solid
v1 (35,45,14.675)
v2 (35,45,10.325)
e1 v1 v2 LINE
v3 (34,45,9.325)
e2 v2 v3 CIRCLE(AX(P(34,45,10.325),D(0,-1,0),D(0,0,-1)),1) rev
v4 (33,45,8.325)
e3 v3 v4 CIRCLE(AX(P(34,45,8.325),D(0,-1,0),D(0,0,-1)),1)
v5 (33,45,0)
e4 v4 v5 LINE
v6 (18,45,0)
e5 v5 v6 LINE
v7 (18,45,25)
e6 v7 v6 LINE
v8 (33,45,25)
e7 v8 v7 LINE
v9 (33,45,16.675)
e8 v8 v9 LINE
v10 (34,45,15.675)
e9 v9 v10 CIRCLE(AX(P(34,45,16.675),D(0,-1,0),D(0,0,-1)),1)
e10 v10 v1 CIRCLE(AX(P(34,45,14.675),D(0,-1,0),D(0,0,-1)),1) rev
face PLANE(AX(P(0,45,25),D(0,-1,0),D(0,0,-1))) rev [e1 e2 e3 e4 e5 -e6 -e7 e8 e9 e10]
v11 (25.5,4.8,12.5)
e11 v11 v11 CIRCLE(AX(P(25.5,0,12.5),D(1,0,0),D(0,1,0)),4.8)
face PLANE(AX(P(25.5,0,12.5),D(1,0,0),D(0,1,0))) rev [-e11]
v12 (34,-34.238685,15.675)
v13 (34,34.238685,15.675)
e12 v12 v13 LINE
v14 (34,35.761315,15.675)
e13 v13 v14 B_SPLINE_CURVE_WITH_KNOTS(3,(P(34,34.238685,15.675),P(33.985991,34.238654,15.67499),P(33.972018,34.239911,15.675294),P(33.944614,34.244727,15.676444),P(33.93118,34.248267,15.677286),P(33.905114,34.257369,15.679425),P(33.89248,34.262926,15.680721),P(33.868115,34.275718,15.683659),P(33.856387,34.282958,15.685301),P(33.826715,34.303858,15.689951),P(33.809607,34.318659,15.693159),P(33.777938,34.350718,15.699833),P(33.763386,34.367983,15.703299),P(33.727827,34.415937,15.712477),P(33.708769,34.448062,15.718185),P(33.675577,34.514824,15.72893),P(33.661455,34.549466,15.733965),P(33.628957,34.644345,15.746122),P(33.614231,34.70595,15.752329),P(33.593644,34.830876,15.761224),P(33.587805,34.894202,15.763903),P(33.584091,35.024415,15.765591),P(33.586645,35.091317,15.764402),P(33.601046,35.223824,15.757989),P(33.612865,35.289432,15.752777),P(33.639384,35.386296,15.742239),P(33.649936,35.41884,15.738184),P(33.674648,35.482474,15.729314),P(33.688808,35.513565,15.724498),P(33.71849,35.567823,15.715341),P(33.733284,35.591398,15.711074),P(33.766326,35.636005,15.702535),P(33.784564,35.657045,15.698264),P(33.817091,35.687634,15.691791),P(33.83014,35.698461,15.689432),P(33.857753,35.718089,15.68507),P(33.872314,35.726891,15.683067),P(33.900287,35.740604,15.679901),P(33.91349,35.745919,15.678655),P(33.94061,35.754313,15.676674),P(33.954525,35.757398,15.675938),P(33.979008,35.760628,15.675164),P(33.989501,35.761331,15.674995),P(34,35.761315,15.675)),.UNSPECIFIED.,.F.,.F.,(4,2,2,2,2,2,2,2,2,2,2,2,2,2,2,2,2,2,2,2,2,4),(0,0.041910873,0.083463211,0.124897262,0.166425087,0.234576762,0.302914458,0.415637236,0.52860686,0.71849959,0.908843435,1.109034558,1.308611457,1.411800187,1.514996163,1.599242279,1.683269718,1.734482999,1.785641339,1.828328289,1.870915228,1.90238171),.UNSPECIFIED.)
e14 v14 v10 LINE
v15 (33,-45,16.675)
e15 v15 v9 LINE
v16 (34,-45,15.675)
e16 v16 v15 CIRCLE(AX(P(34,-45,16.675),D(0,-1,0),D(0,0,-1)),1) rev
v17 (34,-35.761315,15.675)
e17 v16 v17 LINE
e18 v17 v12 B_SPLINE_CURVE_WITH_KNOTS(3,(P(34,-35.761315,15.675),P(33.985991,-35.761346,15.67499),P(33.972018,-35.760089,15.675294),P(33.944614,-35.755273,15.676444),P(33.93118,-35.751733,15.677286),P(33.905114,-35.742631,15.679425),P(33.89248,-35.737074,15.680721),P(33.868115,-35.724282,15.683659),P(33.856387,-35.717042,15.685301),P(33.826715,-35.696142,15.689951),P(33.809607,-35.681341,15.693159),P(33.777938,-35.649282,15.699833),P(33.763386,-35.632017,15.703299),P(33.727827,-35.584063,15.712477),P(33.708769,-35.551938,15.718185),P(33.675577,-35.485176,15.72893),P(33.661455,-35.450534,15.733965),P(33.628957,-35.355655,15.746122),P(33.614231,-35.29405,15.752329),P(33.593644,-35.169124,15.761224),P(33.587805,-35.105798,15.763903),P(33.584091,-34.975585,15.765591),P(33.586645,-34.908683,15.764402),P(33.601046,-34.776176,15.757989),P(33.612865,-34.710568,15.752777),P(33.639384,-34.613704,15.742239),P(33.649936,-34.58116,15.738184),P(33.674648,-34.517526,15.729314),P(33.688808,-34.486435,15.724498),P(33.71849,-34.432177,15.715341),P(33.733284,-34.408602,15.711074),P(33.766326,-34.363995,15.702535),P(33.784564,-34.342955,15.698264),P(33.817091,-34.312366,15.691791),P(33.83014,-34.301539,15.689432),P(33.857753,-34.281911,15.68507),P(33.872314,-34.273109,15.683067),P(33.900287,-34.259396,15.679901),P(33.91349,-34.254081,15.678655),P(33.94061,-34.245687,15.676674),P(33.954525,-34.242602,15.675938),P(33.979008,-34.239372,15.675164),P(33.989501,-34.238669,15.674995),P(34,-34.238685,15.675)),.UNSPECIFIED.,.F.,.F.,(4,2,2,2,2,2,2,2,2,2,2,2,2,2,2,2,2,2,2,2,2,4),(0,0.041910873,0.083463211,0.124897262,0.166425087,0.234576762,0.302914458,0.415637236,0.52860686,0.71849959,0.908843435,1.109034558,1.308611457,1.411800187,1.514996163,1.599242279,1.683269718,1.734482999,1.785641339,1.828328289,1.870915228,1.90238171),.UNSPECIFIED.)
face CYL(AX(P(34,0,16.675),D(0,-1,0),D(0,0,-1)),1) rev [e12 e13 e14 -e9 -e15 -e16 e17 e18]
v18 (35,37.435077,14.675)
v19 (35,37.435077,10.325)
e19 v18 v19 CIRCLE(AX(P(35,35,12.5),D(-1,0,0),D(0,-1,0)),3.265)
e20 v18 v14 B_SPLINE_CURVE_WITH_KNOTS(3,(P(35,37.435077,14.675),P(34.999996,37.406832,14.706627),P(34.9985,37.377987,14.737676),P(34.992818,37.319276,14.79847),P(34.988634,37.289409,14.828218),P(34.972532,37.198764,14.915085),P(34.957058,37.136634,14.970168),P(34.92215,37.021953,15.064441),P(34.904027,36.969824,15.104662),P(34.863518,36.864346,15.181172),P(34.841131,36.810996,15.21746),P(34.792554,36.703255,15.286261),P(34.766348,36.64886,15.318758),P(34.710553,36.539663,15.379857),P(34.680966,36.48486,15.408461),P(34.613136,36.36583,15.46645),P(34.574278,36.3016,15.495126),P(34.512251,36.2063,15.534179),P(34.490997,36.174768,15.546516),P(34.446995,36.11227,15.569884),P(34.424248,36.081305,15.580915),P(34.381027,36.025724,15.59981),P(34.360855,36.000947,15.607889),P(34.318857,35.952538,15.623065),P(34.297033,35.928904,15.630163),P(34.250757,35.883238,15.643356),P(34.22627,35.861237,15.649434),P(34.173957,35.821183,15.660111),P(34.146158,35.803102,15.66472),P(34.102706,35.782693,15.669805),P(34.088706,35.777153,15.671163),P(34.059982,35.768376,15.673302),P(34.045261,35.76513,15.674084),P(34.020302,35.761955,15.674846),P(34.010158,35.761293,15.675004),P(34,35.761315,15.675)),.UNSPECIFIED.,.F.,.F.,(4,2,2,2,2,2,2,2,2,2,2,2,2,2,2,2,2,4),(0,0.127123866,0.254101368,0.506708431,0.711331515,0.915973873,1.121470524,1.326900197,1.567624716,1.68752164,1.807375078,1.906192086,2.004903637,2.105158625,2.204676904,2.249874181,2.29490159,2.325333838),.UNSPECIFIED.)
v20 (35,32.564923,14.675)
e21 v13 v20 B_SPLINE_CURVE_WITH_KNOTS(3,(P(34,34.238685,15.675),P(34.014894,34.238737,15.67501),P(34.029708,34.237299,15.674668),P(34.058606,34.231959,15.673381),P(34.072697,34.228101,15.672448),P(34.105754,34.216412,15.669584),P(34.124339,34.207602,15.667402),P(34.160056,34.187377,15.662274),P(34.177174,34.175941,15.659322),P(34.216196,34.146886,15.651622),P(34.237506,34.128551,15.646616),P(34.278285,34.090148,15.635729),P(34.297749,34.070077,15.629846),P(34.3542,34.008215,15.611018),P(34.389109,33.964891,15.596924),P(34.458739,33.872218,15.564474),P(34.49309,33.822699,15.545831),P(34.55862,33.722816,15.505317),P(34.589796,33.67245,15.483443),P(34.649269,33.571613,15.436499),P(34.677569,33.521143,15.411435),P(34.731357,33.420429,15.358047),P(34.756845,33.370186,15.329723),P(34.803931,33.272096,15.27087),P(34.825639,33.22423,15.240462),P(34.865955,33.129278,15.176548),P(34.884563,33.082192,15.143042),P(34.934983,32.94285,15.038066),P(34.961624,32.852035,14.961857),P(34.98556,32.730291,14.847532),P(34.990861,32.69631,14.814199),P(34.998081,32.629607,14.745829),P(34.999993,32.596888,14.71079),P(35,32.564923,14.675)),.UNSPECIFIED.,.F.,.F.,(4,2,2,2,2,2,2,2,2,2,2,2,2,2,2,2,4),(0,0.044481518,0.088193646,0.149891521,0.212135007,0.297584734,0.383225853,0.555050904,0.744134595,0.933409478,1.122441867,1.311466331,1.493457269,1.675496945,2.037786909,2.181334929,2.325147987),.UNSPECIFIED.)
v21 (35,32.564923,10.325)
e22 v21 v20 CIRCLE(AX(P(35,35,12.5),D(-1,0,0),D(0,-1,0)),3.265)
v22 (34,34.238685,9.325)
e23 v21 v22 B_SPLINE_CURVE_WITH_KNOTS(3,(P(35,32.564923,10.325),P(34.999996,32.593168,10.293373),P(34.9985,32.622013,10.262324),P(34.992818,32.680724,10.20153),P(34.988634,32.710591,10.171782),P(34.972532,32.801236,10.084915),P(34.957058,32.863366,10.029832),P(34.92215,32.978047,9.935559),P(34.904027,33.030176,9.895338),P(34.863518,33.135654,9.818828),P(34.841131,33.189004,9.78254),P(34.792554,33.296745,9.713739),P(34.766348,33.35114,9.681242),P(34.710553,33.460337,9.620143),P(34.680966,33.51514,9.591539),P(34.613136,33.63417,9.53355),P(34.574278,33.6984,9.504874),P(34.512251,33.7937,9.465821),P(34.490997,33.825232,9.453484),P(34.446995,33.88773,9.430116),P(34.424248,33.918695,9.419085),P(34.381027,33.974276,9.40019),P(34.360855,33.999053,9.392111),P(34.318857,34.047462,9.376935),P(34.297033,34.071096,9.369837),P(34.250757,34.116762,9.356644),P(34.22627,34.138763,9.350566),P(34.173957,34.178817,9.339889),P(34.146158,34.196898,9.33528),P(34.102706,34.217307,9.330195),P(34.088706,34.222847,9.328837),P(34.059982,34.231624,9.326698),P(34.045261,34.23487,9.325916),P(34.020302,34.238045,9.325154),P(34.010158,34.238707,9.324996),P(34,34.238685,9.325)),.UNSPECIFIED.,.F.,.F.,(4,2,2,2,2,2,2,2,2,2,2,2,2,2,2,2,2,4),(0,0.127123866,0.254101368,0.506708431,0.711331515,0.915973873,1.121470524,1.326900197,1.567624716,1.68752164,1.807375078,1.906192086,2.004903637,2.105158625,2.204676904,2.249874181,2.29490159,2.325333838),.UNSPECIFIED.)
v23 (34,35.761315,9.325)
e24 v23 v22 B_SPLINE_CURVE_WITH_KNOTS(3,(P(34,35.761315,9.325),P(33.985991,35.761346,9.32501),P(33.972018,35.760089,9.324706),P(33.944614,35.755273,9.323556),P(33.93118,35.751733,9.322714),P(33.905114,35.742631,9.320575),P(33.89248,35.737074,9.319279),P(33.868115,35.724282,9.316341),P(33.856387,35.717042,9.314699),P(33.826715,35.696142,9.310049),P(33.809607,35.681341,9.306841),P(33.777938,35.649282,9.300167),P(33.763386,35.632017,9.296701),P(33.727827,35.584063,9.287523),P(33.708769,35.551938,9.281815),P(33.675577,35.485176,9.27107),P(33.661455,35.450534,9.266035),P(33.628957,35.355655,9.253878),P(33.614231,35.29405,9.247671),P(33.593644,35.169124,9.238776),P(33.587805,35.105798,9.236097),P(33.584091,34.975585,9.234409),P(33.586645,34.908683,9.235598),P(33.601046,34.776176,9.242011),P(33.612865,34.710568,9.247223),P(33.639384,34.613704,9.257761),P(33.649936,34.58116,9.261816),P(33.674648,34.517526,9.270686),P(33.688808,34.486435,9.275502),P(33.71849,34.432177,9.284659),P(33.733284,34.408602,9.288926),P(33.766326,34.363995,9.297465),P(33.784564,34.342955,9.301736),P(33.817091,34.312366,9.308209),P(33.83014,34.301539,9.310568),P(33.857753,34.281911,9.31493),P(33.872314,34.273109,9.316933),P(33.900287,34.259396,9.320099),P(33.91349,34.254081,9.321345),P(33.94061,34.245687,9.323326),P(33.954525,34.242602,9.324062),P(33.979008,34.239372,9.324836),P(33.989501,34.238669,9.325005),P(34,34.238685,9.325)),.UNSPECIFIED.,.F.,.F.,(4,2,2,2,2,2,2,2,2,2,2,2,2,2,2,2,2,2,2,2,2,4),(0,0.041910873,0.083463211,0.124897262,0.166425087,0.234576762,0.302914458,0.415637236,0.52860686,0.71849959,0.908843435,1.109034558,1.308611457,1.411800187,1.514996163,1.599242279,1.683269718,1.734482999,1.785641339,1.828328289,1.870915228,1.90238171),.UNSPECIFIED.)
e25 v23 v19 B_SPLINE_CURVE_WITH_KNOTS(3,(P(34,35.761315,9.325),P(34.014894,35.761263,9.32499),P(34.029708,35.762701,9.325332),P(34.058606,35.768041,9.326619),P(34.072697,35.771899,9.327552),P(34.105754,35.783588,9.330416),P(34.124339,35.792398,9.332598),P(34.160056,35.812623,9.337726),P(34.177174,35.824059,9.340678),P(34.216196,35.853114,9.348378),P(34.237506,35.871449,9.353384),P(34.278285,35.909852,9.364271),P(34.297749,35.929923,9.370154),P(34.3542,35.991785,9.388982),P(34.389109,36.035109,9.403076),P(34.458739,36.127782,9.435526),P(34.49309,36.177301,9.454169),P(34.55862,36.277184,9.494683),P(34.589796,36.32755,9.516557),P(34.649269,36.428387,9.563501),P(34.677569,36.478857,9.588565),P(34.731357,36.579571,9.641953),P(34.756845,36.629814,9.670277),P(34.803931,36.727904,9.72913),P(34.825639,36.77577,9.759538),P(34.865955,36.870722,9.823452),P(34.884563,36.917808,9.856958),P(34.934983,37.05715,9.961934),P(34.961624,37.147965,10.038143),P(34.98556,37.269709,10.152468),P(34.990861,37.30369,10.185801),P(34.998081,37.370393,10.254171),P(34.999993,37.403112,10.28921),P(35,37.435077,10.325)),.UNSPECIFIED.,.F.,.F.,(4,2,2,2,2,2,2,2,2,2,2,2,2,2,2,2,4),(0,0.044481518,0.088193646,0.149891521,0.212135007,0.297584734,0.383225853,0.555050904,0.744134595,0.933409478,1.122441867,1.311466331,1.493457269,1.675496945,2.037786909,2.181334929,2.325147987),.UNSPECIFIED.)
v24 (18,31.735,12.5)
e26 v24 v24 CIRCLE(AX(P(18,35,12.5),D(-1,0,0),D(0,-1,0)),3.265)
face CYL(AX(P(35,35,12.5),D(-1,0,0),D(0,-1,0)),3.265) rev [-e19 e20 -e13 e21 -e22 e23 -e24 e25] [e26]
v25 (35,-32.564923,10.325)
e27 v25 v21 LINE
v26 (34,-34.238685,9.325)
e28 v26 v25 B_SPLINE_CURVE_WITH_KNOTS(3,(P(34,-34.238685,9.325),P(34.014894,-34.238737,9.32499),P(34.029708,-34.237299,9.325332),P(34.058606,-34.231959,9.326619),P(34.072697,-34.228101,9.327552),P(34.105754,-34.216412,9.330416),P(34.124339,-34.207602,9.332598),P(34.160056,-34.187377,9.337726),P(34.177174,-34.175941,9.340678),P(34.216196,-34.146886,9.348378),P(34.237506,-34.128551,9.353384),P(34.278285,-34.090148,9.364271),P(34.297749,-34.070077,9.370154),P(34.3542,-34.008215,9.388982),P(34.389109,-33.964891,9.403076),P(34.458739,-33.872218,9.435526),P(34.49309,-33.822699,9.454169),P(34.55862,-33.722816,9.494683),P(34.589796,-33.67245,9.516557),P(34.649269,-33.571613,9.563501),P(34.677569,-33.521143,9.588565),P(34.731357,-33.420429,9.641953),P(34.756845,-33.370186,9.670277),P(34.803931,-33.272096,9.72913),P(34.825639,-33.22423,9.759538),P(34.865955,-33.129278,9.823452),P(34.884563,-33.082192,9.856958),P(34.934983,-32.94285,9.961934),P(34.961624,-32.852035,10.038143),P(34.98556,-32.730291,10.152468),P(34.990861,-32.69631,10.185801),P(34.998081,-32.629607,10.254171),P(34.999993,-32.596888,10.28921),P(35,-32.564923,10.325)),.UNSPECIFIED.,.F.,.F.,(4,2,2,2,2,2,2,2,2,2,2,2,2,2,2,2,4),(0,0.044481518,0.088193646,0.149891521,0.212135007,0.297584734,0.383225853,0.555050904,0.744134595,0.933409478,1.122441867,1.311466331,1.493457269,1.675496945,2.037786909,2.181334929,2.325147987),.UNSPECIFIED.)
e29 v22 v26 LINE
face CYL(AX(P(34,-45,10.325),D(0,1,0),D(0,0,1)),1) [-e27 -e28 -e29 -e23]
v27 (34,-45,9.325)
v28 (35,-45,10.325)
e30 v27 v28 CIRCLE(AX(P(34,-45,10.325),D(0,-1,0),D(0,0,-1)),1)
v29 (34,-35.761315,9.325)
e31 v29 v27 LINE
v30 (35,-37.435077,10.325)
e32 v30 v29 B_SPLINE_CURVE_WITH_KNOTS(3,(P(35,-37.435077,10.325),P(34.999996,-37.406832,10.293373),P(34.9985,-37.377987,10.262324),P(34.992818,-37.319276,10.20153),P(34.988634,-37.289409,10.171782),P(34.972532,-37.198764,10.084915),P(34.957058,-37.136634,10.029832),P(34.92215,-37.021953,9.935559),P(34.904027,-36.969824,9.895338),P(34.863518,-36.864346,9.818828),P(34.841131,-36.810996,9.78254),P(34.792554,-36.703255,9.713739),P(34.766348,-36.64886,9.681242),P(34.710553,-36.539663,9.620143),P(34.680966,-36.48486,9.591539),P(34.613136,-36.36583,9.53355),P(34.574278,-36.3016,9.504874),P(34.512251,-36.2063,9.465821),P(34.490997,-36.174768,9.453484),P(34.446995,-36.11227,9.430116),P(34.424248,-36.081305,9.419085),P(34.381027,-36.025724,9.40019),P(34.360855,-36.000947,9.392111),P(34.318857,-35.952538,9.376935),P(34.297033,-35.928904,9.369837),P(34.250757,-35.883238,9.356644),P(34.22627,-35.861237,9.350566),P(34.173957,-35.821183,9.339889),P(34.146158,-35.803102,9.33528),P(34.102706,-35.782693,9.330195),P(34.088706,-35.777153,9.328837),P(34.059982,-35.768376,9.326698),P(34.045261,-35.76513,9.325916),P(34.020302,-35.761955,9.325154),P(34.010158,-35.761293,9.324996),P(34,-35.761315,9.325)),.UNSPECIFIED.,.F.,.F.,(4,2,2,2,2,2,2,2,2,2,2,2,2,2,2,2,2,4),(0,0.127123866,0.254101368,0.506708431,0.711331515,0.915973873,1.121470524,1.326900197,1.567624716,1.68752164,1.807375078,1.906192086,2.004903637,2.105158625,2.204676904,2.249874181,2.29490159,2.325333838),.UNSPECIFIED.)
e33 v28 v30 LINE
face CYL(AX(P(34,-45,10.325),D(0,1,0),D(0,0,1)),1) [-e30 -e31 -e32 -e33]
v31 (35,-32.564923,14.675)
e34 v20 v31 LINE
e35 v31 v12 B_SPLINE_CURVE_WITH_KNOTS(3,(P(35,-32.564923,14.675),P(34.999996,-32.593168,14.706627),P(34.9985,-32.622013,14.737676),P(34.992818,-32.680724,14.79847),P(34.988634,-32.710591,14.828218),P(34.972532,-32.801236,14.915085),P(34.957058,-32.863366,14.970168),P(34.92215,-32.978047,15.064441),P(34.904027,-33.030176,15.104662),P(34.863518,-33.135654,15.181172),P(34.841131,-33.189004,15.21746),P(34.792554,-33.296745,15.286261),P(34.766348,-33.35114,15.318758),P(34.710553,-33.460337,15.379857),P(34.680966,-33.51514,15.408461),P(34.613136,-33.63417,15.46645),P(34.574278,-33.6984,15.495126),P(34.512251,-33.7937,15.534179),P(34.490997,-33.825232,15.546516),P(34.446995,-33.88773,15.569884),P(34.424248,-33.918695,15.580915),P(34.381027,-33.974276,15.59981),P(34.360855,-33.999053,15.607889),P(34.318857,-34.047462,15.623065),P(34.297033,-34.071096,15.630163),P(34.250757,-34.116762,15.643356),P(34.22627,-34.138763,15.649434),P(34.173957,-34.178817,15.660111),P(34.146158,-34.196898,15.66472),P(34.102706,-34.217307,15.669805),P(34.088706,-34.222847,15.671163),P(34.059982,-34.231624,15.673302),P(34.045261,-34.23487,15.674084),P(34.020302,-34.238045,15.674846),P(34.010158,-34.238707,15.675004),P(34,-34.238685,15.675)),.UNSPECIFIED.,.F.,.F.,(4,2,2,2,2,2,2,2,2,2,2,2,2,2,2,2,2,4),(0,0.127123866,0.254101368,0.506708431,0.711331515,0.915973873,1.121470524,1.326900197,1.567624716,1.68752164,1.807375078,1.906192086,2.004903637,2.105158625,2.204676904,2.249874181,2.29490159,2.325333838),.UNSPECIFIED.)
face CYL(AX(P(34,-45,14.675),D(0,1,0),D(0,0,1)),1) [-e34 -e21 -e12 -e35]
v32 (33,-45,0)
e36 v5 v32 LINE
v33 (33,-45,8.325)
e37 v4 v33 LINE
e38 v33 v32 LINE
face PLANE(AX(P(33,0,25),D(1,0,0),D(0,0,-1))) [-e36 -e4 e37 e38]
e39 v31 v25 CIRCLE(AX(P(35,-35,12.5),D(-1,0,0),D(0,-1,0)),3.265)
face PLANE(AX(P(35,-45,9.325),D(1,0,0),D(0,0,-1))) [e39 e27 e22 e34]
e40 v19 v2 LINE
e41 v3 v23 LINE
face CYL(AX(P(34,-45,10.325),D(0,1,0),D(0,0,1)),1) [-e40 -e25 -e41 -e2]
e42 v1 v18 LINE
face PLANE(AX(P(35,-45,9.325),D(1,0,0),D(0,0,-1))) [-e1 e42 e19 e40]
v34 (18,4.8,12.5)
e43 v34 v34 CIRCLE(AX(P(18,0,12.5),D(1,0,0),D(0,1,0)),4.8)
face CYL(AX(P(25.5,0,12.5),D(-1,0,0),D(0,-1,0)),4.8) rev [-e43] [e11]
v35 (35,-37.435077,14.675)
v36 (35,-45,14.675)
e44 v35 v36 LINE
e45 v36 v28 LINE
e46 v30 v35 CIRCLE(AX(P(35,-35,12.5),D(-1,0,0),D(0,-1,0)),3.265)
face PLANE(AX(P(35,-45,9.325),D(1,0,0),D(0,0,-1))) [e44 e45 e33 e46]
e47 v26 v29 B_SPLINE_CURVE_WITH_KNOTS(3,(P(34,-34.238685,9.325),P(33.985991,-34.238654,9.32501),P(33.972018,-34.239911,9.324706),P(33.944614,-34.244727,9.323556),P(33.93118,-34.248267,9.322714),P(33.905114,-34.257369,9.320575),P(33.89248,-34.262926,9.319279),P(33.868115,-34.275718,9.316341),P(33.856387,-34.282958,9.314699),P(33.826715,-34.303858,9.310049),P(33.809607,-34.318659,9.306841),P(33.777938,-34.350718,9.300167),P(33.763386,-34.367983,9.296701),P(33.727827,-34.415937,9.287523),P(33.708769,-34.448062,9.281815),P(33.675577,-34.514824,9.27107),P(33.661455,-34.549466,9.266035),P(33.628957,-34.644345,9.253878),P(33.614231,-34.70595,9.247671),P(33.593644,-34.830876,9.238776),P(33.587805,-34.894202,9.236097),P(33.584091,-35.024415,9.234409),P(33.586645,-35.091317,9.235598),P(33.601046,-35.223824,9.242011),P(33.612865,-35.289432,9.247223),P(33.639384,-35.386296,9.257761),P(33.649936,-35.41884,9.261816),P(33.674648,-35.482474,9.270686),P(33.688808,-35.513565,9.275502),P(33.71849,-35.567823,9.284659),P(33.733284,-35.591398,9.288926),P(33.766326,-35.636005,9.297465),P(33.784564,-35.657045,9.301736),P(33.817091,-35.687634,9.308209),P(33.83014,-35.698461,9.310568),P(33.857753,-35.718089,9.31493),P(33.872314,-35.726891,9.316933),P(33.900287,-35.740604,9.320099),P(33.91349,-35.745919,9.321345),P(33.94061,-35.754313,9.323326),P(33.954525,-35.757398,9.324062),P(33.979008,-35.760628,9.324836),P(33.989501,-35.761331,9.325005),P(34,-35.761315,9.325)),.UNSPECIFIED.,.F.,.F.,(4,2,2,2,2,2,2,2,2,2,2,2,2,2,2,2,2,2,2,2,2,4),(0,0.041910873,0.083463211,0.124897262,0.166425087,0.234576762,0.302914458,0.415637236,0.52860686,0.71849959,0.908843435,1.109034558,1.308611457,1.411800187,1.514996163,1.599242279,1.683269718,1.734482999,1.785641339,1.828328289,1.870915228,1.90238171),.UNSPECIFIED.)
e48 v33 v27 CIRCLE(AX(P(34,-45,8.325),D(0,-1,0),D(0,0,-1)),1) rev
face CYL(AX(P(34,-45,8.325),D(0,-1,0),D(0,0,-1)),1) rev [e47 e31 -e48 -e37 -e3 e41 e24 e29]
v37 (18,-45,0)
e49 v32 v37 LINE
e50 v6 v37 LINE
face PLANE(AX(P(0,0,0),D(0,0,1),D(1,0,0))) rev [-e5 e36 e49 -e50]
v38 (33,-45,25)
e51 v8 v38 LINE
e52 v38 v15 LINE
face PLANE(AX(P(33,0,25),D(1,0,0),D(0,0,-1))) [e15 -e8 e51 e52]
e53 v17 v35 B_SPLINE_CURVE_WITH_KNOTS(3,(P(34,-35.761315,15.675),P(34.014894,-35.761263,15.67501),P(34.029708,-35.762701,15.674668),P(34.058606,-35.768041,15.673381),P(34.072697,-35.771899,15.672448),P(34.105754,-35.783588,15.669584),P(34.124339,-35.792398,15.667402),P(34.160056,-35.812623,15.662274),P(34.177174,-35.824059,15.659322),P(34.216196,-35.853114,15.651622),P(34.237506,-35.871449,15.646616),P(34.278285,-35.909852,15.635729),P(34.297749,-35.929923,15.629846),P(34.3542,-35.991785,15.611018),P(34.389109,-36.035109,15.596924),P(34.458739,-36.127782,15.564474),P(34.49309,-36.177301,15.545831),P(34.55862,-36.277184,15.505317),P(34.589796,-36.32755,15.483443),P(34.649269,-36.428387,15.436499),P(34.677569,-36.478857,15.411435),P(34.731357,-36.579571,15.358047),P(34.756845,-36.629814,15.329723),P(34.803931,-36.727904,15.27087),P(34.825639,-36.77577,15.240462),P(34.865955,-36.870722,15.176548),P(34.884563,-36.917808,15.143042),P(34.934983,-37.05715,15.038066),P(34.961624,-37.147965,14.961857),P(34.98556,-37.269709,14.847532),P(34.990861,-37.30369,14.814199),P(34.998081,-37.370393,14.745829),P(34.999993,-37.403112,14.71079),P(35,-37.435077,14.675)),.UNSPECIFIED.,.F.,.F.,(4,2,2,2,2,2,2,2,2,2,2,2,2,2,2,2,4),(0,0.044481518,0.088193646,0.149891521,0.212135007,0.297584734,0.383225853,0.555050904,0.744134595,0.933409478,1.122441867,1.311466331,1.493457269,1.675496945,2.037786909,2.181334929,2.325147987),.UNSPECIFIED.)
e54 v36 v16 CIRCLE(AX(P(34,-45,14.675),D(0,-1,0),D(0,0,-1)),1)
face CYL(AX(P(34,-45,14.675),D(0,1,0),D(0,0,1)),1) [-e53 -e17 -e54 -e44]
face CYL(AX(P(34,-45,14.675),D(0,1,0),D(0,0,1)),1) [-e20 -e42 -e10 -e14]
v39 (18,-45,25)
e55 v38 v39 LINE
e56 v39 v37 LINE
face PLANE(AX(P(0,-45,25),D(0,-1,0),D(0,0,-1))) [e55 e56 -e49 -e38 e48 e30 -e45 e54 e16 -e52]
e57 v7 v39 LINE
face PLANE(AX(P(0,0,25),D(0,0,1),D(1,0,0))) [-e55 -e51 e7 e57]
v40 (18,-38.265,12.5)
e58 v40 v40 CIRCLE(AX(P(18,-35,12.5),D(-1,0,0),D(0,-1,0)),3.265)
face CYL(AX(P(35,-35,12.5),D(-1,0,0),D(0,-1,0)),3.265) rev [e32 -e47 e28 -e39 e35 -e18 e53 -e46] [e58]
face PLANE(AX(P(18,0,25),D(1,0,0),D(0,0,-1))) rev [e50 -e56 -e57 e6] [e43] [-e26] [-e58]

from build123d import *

# Parameters (mm, degrees)
BOSS_EXTRUDE1_DEPTH = 25
SKETCH3_R           = 4.8
CUT_EXTRUDE1_DEPTH  = 7.5
SKETCH6_W           = 2
SKETCH6_H           = 6.35
BOSS_EXTRUDE2_DEPTH = 90
FILLET2_R           = 1
SKETCH7_R           = 3.265
CUT_EXTRUDE2_DEPTH  = 55.212544674


with BuildPart() as part:
    # Sketch2 → Boss-Extrude1 (new body)
    with BuildSketch(Plane.XY):
        Polygon((18, 45), (18, 25), (18, -25), (18, -45), (33, -45), (33, 45), align=None)
    extrude(amount=BOSS_EXTRUDE1_DEPTH)

    # Sketch3 → Cut-Extrude1 (cut)
    with BuildSketch(Plane(origin=(18, 0, 0), x_dir=(0, 0, -1), z_dir=(1, 0, 0))):
        with Locations(Location((-12.5, 0, 0), (0, 0, 90))):
            Circle(SKETCH3_R)
    extrude(amount=CUT_EXTRUDE1_DEPTH, mode=Mode.SUBTRACT)

    # Sketch6 → Boss-Extrude2 (add, through all)
    with BuildSketch(Plane(origin=(0, 45, 0), x_dir=(1, 0, 0), z_dir=(0, 1, 0))):
        with Locations((34, -12.5)):
            Rectangle(SKETCH6_W, SKETCH6_H)
    extrude(amount=-BOSS_EXTRUDE2_DEPTH)

    # Fillet2
    fillet2_edges = [part.edges().sort_by_distance(p)[0] for p in [
        (33, 0, 9.325),
        (33, 0, 15.675),
    ]]
    fillet(fillet2_edges, radius=FILLET2_R)
    fillet2_2_edges = [part.edges().sort_by_distance(p)[0] for p in [
        (35, 0, 9.325),
        (35, 0, 15.675),
    ]]
    fillet(fillet2_2_edges, radius=FILLET2_R - 0.0001)  # a hair under: the kernel refuses the full size

    # Sketch7 → Cut-Extrude2 (cut, through all)
    with BuildSketch(Plane.ZY.offset(-18)):
        with Locations(Location((12.5, 35, 0), (0, 0, 270))):
            Circle(SKETCH7_R)
        with Locations(Location((12.5, -35, 0), (0, 0, 270))):
            Circle(SKETCH7_R)
    extrude(amount=-CUT_EXTRUDE2_DEPTH, mode=Mode.SUBTRACT)


solid = part.part
